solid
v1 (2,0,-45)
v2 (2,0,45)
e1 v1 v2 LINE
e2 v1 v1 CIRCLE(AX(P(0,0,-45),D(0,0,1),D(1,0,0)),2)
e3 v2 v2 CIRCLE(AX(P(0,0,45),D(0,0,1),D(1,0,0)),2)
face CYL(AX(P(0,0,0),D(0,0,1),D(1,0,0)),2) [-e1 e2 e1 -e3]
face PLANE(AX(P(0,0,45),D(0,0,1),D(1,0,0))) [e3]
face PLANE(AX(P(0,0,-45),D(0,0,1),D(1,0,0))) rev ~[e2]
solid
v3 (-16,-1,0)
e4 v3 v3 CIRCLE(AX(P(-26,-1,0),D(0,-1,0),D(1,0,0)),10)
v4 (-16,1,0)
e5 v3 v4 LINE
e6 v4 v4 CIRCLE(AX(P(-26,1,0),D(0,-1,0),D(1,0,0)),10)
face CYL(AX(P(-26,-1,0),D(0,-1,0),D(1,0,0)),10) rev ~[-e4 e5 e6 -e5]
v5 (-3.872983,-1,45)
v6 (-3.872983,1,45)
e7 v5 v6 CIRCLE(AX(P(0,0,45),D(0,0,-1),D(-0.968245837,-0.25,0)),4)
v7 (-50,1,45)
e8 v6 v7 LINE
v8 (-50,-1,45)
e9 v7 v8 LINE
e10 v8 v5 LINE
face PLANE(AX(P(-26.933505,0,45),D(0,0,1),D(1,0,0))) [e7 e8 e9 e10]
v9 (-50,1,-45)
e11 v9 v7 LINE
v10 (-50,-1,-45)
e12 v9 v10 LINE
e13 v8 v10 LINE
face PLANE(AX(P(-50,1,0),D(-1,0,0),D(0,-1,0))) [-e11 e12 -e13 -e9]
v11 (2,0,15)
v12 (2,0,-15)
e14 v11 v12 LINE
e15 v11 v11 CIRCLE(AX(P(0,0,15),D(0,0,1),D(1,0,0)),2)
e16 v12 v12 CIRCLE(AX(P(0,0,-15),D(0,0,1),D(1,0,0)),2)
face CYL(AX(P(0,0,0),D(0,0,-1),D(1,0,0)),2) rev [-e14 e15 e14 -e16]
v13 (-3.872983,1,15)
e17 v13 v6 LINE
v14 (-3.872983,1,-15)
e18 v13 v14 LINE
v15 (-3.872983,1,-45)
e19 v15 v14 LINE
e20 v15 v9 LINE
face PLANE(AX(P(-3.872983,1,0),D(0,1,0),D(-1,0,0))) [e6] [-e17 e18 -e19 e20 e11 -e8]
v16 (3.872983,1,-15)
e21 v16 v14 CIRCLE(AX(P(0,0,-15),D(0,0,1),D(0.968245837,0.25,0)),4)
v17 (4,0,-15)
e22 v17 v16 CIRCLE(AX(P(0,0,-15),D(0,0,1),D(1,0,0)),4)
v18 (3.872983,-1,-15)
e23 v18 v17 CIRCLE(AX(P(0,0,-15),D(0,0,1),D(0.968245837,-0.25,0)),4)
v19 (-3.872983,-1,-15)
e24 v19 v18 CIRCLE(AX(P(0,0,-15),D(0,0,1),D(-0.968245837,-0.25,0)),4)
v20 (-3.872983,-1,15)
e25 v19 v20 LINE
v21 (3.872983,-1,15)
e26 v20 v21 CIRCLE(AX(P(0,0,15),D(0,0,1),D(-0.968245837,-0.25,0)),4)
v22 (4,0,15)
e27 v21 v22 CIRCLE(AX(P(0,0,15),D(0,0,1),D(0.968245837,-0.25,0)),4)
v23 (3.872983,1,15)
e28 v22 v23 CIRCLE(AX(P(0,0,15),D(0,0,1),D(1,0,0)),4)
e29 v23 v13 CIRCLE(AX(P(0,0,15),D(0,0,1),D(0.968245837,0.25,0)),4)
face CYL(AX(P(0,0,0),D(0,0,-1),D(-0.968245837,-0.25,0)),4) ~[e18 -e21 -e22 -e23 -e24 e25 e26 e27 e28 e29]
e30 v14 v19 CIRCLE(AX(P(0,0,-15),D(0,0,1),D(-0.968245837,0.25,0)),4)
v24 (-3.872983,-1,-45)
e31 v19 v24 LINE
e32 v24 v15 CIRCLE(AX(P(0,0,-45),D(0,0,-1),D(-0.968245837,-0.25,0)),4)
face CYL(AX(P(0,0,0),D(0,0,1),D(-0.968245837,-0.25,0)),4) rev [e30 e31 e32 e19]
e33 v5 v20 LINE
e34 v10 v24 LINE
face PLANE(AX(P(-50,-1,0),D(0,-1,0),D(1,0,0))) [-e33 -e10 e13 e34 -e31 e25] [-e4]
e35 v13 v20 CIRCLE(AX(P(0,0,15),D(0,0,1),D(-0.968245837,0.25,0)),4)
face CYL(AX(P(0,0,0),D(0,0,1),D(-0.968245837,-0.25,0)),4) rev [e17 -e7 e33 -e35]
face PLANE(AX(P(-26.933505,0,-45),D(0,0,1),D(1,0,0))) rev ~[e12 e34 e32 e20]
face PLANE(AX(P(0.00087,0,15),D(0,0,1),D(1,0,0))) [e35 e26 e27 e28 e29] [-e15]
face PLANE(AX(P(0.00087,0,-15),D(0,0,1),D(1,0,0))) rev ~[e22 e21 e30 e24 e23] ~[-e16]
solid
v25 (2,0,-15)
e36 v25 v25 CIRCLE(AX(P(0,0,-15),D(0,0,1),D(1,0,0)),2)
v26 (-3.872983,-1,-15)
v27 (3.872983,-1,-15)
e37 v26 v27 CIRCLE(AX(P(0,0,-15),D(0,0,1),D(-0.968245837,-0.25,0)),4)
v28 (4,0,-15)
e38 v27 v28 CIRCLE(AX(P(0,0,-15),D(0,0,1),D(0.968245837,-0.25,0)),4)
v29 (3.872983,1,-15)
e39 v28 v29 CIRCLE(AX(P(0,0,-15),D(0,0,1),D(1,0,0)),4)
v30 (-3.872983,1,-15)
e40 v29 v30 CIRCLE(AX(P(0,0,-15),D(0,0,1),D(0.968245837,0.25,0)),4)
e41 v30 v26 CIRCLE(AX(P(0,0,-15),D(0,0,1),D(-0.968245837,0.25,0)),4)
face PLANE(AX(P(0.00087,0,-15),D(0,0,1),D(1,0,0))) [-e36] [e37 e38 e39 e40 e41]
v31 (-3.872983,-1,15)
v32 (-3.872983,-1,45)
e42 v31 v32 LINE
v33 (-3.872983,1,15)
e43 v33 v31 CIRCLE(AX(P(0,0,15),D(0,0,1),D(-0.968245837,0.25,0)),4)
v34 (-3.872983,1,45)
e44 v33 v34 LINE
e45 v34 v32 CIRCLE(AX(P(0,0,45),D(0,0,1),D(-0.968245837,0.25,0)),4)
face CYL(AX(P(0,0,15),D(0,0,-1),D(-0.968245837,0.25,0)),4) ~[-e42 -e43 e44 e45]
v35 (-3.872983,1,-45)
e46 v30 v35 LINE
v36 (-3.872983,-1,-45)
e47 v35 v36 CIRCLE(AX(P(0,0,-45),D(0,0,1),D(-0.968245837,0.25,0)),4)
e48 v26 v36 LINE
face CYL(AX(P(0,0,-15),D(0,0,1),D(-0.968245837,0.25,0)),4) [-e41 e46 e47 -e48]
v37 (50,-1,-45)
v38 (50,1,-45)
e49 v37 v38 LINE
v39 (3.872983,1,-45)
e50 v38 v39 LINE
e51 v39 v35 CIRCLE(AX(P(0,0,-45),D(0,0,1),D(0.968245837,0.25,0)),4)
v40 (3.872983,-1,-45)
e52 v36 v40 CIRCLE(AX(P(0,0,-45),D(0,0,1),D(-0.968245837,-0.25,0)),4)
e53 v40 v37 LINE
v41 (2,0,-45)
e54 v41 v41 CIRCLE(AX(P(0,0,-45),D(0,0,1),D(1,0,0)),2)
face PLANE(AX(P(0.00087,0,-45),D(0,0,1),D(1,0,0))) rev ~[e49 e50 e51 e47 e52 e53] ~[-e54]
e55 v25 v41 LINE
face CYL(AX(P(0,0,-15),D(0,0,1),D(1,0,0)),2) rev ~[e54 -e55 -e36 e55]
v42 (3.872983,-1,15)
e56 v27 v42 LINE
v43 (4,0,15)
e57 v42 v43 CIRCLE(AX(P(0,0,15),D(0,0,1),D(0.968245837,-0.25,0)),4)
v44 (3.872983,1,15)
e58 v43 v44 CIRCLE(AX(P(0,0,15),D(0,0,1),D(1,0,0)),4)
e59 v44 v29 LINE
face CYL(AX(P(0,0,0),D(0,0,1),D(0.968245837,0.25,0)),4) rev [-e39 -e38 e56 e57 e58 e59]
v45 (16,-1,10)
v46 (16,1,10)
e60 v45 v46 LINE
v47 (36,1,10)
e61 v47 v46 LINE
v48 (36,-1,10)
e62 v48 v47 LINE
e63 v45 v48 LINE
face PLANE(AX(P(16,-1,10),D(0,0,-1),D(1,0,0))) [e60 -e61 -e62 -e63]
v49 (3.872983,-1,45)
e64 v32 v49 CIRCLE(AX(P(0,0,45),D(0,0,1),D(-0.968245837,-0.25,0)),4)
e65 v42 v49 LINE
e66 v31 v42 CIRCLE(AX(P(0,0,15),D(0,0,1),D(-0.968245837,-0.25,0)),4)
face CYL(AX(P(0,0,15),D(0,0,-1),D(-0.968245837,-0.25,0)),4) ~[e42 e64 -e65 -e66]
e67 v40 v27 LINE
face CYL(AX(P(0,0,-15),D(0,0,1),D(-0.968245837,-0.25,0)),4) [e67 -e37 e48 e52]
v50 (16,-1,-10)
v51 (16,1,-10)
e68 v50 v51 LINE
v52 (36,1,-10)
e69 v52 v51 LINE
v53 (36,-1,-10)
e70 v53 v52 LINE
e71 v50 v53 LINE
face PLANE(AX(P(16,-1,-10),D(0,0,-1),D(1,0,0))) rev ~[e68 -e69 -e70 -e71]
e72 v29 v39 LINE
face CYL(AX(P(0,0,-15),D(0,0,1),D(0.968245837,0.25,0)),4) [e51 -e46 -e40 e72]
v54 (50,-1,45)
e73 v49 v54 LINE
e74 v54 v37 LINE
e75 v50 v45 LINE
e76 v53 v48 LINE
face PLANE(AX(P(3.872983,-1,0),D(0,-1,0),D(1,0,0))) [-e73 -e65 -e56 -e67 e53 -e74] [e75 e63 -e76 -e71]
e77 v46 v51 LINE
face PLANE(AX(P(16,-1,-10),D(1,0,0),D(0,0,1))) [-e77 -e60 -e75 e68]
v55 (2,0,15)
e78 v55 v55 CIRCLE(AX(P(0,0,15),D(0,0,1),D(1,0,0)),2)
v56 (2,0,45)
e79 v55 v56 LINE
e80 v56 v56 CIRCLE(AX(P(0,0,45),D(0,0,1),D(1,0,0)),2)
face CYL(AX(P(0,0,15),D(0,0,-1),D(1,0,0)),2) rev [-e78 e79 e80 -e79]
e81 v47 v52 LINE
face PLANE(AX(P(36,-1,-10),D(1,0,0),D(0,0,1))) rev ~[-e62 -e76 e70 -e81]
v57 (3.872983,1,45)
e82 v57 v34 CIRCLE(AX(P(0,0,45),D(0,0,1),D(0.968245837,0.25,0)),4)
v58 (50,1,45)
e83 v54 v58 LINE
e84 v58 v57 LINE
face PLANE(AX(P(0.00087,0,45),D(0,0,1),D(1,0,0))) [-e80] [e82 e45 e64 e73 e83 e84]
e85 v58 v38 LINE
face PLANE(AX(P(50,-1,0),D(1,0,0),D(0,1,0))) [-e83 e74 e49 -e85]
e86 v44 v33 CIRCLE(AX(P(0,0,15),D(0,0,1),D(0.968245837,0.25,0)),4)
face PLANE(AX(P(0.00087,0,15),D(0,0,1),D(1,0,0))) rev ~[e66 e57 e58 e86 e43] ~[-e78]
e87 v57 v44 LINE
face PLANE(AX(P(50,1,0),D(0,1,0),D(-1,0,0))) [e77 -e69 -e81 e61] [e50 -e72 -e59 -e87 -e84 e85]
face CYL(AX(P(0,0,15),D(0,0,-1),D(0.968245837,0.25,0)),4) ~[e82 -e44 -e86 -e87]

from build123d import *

# Parameters (mm, degrees)
F0_R      = 2
F1_DEPTH  = 45
F2_DEPTH  = 45
F3_DEPTH  = 15
F4_DEPTH  = 45
F5_DEPTH  = 30
F6_DEPTH  = 30
F7_R      = 10
F8_DEPTH  = 5.001
F9_W      = 20
F9_H      = 20
F10_DEPTH = 5.001


with BuildPart() as f1:
    # F0 (on Top) → F1 (new body, symmetric)
    with BuildSketch(Plane.XY):
        Circle(F0_R)
    extrude(amount=F1_DEPTH, both=True)


with BuildPart() as f2:
    # F0 (on Top) → F2 (new body, symmetric)
    with BuildSketch(Plane.XY):
        with BuildLine():
            ThreePointArc((-3.8729833462, -1), (-4, 0), (-3.8729833462, 1))
            Line((-3.8729833462, 1), (-50, 1))
            Line((-50, 1), (-50, -1))
            Line((-50, -1), (-3.8729833462, -1))
        make_face()
    extrude(amount=F2_DEPTH, both=True)

    # F0 (on Top) → F3 (join, symmetric)
    with BuildSketch(Plane.XY):
        with BuildLine():
            ThreePointArc((3.8729833462, -1), (3.9681187851, -0.5040171699), (4, 0))
            ThreePointArc((4, 0), (3.9681187851, 0.5040171699), (3.8729833462, 1))
            ThreePointArc((3.8729833462, 1), (0, 4), (-3.8729833462, 1))
            ThreePointArc((-3.8729833462, 1), (-4, 0), (-3.8729833462, -1))
            ThreePointArc((-3.8729833462, -1), (0, -4), (3.8729833462, -1))
        make_face()
        Circle(F0_R, mode=Mode.SUBTRACT)
    extrude(amount=F3_DEPTH, both=True)


with BuildPart() as f4:
    # F0 (on Top) → F4 (new body, symmetric)
    with BuildSketch(Plane.XY):
        with BuildLine():
            ThreePointArc((3.8729833462, 1), (3.9681187851, 0.5040171699), (4, 0))
            ThreePointArc((4, 0), (3.9681187851, -0.5040171699), (3.8729833462, -1))
            Line((3.8729833462, -1), (50, -1))
            Line((50, -1), (50, 1))
            Line((50, 1), (3.8729833462, 1))
        make_face()
    extrude(amount=F4_DEPTH, both=True)

    # F5 (add, through all): a face of the model
    f5_faces = [f2.part.faces().sort_by_distance(p)[0] for p in [
        (-3.886862915, 0, 15),
    ]]
    extrude(f5_faces, amount=F5_DEPTH)

    # F6 (add, through all): a face of the model
    f6_faces = [f2.part.faces().sort_by_distance(p)[0] for p in [
        (-3.886862915, 0, -15),
    ]]
    extrude(f6_faces, amount=F6_DEPTH)

    # F9 (on face) → F10 (cut, through all)
    with BuildSketch(Plane.XZ.offset(1)):
        with Locations((26, 0)):
            Rectangle(F9_W, F9_H)
    extrude(amount=-F10_DEPTH, mode=Mode.SUBTRACT)


with BuildPart() as f2_1:
    add(f2.part)

    # F7 (on face) → F8 (cut, through all)
    with BuildSketch(Plane.XZ.offset(1)):
        with Locations((-26, 0)):
            Circle(F7_R)
    extrude(amount=-F8_DEPTH, mode=Mode.SUBTRACT)


solid = Compound([f1.part, f4.part, f2_1.part])
